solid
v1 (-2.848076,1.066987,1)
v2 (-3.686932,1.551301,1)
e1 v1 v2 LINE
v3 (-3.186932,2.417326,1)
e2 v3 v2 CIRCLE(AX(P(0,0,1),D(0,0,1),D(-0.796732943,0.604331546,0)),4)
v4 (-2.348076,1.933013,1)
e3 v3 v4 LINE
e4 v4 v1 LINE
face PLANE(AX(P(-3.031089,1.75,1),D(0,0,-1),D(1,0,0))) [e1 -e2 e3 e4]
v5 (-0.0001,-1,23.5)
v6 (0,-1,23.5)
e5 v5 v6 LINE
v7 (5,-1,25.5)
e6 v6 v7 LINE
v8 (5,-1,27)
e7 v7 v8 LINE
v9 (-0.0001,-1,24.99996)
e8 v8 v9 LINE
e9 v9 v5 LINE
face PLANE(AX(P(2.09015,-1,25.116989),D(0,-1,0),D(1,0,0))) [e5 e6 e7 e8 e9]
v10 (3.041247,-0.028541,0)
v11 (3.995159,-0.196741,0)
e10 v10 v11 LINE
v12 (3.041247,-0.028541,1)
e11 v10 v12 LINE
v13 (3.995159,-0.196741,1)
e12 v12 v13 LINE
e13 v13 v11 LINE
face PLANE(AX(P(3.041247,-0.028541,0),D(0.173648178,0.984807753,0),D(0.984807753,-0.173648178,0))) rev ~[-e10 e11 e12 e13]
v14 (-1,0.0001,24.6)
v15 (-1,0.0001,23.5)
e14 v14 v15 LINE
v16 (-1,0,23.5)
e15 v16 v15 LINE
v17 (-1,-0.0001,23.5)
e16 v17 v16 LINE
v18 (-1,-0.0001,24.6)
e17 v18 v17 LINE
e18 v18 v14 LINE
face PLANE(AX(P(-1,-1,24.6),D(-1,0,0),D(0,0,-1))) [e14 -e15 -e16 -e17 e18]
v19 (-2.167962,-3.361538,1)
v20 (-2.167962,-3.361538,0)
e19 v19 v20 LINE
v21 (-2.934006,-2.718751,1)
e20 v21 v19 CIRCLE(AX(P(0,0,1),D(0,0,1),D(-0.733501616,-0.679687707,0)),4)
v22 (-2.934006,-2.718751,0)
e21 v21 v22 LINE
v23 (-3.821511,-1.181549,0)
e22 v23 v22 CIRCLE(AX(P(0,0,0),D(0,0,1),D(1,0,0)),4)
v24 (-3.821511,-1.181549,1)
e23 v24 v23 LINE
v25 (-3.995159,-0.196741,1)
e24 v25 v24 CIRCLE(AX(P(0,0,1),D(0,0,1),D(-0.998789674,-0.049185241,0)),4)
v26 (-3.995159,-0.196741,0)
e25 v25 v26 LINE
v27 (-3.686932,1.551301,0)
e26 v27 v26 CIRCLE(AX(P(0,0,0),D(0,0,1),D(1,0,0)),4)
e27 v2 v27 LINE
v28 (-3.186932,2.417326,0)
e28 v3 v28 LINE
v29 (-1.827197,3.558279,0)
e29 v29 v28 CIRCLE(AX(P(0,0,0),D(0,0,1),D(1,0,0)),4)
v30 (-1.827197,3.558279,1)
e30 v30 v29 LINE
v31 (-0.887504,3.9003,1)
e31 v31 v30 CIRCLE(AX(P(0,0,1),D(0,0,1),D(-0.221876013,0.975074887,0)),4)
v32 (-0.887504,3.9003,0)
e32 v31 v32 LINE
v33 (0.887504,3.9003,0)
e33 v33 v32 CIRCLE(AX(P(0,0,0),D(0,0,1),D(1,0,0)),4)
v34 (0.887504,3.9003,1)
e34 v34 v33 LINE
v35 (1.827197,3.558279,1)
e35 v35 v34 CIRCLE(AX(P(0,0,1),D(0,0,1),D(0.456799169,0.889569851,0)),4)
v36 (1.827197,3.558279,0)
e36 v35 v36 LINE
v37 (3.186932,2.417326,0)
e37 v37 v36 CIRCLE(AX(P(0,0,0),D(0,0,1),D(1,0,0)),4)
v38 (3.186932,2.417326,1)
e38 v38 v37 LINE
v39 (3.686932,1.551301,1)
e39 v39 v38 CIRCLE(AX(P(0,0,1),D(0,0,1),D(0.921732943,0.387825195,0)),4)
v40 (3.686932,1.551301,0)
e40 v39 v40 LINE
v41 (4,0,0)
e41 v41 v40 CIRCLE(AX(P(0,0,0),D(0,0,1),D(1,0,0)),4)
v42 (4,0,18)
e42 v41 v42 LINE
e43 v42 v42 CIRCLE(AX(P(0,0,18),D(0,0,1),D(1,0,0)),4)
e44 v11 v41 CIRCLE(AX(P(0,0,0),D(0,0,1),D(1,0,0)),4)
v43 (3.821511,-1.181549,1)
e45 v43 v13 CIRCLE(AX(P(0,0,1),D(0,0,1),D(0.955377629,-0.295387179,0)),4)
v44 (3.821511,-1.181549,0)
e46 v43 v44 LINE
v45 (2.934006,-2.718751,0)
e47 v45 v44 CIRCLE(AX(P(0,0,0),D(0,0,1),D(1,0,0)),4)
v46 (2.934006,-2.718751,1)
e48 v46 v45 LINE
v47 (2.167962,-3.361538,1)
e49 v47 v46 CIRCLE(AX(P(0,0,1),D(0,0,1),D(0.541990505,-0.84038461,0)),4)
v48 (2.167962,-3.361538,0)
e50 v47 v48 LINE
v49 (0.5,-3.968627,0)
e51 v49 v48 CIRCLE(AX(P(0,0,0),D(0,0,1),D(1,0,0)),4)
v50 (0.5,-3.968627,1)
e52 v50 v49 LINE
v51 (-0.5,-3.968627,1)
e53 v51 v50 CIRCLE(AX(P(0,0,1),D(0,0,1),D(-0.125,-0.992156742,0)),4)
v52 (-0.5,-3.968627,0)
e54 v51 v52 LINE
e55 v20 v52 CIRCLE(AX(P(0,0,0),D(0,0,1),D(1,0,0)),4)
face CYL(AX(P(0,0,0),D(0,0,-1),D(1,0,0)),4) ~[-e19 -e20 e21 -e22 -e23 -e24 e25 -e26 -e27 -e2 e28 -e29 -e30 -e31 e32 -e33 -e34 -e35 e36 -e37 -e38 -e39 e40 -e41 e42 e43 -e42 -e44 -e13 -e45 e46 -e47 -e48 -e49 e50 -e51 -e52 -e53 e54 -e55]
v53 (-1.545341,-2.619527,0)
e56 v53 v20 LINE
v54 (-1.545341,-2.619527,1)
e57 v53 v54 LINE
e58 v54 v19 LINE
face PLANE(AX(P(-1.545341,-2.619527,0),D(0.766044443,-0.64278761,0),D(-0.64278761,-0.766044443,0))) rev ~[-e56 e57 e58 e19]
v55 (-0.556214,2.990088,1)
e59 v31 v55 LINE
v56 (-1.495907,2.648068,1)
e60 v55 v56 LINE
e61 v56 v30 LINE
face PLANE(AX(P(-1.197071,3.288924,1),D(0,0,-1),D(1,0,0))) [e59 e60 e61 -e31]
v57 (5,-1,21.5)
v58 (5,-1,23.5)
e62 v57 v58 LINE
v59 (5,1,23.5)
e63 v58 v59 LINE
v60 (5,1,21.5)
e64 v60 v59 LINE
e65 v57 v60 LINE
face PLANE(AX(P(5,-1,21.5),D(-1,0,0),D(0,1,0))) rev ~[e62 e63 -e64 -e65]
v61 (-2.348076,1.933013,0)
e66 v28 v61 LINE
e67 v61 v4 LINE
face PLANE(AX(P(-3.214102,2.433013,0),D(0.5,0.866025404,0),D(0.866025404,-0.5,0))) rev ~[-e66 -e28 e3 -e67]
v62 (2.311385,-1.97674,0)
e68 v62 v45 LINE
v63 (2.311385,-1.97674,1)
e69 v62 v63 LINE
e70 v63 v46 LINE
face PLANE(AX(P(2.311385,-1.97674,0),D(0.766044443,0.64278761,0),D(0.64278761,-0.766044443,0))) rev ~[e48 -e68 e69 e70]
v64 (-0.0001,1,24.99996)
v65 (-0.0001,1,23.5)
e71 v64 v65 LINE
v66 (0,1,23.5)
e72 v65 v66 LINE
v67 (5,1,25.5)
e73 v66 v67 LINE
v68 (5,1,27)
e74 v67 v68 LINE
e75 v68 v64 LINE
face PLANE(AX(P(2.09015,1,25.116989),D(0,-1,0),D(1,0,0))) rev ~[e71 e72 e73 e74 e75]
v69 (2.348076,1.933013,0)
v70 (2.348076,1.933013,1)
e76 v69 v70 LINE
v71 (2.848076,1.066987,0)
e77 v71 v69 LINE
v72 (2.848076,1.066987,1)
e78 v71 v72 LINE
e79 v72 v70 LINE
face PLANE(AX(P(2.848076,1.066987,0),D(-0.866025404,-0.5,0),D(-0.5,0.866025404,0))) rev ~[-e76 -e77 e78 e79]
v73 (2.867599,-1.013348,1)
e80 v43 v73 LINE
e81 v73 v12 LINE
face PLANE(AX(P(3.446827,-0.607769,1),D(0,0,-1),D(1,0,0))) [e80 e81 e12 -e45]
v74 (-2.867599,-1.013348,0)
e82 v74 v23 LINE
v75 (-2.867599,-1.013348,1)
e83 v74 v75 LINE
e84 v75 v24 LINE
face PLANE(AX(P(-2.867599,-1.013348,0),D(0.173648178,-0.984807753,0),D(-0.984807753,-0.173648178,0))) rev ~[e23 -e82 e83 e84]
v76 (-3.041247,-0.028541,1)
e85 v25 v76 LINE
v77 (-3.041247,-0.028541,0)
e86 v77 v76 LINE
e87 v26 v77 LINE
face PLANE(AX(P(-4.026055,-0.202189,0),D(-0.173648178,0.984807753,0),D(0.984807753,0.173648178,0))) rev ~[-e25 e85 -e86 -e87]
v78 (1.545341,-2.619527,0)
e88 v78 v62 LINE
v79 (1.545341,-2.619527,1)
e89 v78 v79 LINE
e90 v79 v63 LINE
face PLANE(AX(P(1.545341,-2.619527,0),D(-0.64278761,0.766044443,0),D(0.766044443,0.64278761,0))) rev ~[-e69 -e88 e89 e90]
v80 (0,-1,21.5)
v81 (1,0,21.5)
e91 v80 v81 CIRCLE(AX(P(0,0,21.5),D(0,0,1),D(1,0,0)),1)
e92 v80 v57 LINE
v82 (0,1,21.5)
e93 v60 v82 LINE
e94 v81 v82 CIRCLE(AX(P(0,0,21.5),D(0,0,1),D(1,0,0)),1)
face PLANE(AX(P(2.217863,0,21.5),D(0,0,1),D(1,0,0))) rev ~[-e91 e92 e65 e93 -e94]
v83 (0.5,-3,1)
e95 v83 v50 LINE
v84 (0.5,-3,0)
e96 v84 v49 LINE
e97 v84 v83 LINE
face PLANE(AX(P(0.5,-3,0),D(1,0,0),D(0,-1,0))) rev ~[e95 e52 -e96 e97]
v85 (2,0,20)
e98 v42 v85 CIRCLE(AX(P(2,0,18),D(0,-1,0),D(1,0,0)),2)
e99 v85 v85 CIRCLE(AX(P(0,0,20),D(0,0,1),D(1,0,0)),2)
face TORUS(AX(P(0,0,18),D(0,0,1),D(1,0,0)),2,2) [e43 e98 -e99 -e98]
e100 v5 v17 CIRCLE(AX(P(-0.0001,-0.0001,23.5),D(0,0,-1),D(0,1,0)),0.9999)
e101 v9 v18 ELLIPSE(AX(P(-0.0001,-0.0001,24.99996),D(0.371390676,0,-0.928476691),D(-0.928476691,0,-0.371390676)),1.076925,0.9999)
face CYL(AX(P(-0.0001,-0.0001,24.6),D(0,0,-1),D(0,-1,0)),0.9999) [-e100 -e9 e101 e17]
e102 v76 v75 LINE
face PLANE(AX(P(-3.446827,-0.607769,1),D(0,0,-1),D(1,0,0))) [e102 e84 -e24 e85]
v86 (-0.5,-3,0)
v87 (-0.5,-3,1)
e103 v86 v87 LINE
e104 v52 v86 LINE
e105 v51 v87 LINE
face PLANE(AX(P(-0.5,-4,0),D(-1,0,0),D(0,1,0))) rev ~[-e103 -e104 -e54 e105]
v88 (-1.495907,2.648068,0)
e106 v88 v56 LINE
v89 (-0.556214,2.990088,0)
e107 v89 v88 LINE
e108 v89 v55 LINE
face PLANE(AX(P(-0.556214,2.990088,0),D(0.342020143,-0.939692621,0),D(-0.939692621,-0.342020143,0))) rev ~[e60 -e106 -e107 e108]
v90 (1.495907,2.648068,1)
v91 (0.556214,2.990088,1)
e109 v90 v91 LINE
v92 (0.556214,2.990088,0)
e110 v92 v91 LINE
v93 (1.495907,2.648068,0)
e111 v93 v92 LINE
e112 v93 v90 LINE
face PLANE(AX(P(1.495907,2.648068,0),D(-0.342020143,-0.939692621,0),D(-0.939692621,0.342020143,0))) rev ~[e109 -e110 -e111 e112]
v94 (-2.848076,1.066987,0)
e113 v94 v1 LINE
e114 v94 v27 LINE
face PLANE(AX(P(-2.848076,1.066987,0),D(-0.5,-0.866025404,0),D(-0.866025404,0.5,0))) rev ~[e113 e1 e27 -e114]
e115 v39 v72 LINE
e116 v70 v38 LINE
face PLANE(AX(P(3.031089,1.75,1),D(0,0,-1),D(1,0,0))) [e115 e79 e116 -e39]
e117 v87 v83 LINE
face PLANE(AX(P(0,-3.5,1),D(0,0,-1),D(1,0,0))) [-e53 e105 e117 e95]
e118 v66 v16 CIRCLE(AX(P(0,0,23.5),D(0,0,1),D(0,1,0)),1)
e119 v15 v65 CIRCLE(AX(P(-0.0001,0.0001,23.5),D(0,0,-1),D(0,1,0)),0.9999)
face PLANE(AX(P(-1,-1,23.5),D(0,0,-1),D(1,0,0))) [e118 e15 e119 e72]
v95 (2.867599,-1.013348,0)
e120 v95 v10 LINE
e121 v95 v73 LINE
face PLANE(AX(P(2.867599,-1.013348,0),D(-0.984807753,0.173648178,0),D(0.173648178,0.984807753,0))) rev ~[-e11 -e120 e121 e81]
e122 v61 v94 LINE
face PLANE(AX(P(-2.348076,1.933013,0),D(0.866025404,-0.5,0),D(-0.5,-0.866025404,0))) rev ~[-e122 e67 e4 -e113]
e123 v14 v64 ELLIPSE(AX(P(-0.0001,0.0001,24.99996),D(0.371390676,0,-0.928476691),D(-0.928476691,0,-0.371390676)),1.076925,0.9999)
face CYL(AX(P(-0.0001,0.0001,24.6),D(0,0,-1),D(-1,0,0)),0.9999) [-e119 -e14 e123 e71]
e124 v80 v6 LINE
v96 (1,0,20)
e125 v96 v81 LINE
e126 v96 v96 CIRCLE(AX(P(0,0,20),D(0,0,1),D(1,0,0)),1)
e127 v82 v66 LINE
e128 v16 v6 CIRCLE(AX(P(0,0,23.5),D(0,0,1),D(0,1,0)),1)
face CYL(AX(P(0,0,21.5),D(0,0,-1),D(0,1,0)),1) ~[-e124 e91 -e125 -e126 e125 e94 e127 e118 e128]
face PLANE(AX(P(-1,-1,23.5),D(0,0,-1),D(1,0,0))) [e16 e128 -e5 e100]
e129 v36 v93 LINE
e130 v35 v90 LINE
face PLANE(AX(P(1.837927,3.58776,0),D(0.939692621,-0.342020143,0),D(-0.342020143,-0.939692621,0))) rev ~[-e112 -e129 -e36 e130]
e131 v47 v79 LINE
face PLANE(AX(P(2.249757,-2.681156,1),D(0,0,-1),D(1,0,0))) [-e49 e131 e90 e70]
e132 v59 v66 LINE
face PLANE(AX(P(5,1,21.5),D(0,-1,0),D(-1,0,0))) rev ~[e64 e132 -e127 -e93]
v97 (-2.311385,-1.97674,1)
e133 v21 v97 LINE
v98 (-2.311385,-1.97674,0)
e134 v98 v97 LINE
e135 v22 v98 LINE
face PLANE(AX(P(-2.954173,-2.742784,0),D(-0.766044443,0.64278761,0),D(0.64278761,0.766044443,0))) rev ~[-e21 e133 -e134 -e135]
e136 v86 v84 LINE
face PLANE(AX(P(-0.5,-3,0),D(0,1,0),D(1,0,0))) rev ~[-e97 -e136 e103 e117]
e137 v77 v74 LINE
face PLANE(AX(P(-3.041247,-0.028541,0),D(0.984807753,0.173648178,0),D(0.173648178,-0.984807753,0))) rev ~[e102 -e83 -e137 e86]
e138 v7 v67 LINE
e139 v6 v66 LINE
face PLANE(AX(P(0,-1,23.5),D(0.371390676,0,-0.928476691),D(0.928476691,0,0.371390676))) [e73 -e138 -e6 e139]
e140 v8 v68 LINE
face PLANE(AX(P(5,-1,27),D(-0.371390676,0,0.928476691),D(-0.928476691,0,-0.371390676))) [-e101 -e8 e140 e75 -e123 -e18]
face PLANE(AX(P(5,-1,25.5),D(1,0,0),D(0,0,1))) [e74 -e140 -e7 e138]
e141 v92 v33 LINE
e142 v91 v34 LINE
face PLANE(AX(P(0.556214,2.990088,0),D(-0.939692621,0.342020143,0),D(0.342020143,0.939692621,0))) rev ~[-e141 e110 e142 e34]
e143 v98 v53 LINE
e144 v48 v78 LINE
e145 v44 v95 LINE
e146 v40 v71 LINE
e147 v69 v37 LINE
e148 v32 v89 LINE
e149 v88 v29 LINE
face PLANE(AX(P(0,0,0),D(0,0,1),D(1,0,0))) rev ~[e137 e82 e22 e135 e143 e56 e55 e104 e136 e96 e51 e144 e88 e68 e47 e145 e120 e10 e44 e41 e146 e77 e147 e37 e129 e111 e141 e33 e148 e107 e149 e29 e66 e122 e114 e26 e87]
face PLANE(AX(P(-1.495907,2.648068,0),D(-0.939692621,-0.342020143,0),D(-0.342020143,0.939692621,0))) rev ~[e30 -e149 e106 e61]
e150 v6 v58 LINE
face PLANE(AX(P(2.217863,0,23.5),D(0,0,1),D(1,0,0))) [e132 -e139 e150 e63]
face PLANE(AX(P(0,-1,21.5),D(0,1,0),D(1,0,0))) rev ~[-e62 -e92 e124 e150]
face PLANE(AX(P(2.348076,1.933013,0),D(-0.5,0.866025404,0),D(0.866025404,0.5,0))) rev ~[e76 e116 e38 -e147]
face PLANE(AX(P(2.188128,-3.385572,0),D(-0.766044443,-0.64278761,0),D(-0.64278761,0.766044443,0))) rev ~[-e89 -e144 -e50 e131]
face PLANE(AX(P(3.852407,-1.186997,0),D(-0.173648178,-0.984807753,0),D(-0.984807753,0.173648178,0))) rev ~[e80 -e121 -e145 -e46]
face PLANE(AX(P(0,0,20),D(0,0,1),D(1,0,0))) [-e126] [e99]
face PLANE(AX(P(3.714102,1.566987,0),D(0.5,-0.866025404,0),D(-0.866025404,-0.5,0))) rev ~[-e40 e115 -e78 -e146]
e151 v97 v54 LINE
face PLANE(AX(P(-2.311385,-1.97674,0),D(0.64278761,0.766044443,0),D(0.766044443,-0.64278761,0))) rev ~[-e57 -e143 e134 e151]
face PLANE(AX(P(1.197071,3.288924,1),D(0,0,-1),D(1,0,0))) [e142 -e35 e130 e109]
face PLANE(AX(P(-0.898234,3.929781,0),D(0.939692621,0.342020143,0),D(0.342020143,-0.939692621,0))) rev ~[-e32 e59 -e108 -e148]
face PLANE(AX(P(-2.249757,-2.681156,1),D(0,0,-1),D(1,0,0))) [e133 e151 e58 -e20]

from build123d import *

# Parameters (mm, degrees)
F0_R      = 4
F1_DEPTH  = 20
F2_R      = 2
F3_R      = 1
F4_DEPTH  = 1.5
F6_DEPTH  = 2
F8_DEPTH  = 2
F9_R      = 0.9999
F11_DEPTH = 1


# Not quite as in the source:
# - a fillet or chamfer is up to 0.001 mm smaller than in the source, because OpenCascade refuses the exact size


with BuildPart() as f1:
    # F0 (on Top) → F1 (new body)
    with BuildSketch(Plane.XY):
        Circle(F0_R)
    extrude(amount=F1_DEPTH)

    # F2
    f2_edges = [f1.edges().sort_by_distance(p)[0] for p in [
        (-4, 0, 20),
    ]]
    fillet(f2_edges, radius=F2_R)

    # F3 (on face) → F4 (join)
    with BuildSketch(Plane.XY.offset(20)):
        Circle(F3_R)
    extrude(amount=F4_DEPTH)

    # F5 (on face) → F6 (join)
    with BuildSketch(Plane.XY.offset(21.5)):
        with BuildLine():
            Line((5, 1), (0, 1))
            ThreePointArc((0, 1), (-1, 0), (0, -1))
            Line((0, -1), (5, -1))
            Line((5, -1), (5, 1))
        make_face()
    extrude(amount=F6_DEPTH)

    # F7 (on face) → F8 (join)
    with BuildSketch(Plane.XZ.offset(1)):
        Polygon((-1, 23.5), (0, 23.5), (5, 25.5), (5, 27), (-1, 24.6), align=None)
    extrude(amount=-F8_DEPTH)

    # F9 (radius 1 in the source; OpenCascade refuses exactly that, so slightly less here)
    f9_edges = [f1.edges().sort_by_distance(p)[0] for p in [
        (-1, -1, 24.05),
        (-1, 1, 24.05),
    ]]
    fillet(f9_edges, radius=F9_R)

    # F10 (on face) → F11 (cut)
    with BuildSketch(Plane(origin=(0, 0, 0), x_dir=(1, 0, 0), z_dir=(0, 0, -1))):
        Polygon((0.5, 4), (0, 4), (-0.5, 4), (-0.5, 3), (0.5, 3), align=None)
        Polygon((2.3113850506, 1.9767395245), (2.9541726603, 2.7427839676), (2.5711504387, 3.0641777725), (2.1881282172, 3.3855715773), (1.5453406075, 2.6195271342), align=None)
        Polygon((3.0412473479, 0.0285406565), (4.0260551009, 0.2021888342), (3.939231012, 0.6945927107), (3.8524069232, 1.1869965872), (2.8675991702, 1.0133484095), align=None)
        Polygon((2.3480762114, -1.9330127019), (3.2141016151, -2.4330127019), (3.4641016151, -2), (3.7141016151, -1.5669872981), (2.8480762114, -1.0669872981), align=None)
        Polygon((0.5562141196, -2.990087934), (0.8982342629, -3.9297805548), (1.3680805733, -3.7587704831), (1.8379268837, -3.5877604115), (1.4959067404, -2.6480677907), align=None)
        Polygon((-1.4959067404, -2.6480677907), (-1.8379268837, -3.5877604115), (-1.3680805733, -3.7587704831), (-0.8982342629, -3.9297805548), (-0.5562141196, -2.990087934), align=None)
        Polygon((-2.8480762114, -1.0669872981), (-3.7141016151, -1.5669872981), (-3.4641016151, -2), (-3.2141016151, -2.4330127019), (-2.3480762114, -1.9330127019), align=None)
        Polygon((-2.8675991702, 1.0133484095), (-3.8524069232, 1.1869965872), (-3.939231012, 0.6945927107), (-4.0260551009, 0.2021888342), (-3.0412473479, 0.0285406565), align=None)
        Polygon((-1.5453406075, 2.6195271342), (-2.1881282172, 3.3855715773), (-2.5711504387, 3.0641777725), (-2.9541726603, 2.7427839676), (-2.3113850506, 1.9767395245), align=None)
    extrude(amount=-F11_DEPTH, mode=Mode.SUBTRACT)


solid = f1.part
